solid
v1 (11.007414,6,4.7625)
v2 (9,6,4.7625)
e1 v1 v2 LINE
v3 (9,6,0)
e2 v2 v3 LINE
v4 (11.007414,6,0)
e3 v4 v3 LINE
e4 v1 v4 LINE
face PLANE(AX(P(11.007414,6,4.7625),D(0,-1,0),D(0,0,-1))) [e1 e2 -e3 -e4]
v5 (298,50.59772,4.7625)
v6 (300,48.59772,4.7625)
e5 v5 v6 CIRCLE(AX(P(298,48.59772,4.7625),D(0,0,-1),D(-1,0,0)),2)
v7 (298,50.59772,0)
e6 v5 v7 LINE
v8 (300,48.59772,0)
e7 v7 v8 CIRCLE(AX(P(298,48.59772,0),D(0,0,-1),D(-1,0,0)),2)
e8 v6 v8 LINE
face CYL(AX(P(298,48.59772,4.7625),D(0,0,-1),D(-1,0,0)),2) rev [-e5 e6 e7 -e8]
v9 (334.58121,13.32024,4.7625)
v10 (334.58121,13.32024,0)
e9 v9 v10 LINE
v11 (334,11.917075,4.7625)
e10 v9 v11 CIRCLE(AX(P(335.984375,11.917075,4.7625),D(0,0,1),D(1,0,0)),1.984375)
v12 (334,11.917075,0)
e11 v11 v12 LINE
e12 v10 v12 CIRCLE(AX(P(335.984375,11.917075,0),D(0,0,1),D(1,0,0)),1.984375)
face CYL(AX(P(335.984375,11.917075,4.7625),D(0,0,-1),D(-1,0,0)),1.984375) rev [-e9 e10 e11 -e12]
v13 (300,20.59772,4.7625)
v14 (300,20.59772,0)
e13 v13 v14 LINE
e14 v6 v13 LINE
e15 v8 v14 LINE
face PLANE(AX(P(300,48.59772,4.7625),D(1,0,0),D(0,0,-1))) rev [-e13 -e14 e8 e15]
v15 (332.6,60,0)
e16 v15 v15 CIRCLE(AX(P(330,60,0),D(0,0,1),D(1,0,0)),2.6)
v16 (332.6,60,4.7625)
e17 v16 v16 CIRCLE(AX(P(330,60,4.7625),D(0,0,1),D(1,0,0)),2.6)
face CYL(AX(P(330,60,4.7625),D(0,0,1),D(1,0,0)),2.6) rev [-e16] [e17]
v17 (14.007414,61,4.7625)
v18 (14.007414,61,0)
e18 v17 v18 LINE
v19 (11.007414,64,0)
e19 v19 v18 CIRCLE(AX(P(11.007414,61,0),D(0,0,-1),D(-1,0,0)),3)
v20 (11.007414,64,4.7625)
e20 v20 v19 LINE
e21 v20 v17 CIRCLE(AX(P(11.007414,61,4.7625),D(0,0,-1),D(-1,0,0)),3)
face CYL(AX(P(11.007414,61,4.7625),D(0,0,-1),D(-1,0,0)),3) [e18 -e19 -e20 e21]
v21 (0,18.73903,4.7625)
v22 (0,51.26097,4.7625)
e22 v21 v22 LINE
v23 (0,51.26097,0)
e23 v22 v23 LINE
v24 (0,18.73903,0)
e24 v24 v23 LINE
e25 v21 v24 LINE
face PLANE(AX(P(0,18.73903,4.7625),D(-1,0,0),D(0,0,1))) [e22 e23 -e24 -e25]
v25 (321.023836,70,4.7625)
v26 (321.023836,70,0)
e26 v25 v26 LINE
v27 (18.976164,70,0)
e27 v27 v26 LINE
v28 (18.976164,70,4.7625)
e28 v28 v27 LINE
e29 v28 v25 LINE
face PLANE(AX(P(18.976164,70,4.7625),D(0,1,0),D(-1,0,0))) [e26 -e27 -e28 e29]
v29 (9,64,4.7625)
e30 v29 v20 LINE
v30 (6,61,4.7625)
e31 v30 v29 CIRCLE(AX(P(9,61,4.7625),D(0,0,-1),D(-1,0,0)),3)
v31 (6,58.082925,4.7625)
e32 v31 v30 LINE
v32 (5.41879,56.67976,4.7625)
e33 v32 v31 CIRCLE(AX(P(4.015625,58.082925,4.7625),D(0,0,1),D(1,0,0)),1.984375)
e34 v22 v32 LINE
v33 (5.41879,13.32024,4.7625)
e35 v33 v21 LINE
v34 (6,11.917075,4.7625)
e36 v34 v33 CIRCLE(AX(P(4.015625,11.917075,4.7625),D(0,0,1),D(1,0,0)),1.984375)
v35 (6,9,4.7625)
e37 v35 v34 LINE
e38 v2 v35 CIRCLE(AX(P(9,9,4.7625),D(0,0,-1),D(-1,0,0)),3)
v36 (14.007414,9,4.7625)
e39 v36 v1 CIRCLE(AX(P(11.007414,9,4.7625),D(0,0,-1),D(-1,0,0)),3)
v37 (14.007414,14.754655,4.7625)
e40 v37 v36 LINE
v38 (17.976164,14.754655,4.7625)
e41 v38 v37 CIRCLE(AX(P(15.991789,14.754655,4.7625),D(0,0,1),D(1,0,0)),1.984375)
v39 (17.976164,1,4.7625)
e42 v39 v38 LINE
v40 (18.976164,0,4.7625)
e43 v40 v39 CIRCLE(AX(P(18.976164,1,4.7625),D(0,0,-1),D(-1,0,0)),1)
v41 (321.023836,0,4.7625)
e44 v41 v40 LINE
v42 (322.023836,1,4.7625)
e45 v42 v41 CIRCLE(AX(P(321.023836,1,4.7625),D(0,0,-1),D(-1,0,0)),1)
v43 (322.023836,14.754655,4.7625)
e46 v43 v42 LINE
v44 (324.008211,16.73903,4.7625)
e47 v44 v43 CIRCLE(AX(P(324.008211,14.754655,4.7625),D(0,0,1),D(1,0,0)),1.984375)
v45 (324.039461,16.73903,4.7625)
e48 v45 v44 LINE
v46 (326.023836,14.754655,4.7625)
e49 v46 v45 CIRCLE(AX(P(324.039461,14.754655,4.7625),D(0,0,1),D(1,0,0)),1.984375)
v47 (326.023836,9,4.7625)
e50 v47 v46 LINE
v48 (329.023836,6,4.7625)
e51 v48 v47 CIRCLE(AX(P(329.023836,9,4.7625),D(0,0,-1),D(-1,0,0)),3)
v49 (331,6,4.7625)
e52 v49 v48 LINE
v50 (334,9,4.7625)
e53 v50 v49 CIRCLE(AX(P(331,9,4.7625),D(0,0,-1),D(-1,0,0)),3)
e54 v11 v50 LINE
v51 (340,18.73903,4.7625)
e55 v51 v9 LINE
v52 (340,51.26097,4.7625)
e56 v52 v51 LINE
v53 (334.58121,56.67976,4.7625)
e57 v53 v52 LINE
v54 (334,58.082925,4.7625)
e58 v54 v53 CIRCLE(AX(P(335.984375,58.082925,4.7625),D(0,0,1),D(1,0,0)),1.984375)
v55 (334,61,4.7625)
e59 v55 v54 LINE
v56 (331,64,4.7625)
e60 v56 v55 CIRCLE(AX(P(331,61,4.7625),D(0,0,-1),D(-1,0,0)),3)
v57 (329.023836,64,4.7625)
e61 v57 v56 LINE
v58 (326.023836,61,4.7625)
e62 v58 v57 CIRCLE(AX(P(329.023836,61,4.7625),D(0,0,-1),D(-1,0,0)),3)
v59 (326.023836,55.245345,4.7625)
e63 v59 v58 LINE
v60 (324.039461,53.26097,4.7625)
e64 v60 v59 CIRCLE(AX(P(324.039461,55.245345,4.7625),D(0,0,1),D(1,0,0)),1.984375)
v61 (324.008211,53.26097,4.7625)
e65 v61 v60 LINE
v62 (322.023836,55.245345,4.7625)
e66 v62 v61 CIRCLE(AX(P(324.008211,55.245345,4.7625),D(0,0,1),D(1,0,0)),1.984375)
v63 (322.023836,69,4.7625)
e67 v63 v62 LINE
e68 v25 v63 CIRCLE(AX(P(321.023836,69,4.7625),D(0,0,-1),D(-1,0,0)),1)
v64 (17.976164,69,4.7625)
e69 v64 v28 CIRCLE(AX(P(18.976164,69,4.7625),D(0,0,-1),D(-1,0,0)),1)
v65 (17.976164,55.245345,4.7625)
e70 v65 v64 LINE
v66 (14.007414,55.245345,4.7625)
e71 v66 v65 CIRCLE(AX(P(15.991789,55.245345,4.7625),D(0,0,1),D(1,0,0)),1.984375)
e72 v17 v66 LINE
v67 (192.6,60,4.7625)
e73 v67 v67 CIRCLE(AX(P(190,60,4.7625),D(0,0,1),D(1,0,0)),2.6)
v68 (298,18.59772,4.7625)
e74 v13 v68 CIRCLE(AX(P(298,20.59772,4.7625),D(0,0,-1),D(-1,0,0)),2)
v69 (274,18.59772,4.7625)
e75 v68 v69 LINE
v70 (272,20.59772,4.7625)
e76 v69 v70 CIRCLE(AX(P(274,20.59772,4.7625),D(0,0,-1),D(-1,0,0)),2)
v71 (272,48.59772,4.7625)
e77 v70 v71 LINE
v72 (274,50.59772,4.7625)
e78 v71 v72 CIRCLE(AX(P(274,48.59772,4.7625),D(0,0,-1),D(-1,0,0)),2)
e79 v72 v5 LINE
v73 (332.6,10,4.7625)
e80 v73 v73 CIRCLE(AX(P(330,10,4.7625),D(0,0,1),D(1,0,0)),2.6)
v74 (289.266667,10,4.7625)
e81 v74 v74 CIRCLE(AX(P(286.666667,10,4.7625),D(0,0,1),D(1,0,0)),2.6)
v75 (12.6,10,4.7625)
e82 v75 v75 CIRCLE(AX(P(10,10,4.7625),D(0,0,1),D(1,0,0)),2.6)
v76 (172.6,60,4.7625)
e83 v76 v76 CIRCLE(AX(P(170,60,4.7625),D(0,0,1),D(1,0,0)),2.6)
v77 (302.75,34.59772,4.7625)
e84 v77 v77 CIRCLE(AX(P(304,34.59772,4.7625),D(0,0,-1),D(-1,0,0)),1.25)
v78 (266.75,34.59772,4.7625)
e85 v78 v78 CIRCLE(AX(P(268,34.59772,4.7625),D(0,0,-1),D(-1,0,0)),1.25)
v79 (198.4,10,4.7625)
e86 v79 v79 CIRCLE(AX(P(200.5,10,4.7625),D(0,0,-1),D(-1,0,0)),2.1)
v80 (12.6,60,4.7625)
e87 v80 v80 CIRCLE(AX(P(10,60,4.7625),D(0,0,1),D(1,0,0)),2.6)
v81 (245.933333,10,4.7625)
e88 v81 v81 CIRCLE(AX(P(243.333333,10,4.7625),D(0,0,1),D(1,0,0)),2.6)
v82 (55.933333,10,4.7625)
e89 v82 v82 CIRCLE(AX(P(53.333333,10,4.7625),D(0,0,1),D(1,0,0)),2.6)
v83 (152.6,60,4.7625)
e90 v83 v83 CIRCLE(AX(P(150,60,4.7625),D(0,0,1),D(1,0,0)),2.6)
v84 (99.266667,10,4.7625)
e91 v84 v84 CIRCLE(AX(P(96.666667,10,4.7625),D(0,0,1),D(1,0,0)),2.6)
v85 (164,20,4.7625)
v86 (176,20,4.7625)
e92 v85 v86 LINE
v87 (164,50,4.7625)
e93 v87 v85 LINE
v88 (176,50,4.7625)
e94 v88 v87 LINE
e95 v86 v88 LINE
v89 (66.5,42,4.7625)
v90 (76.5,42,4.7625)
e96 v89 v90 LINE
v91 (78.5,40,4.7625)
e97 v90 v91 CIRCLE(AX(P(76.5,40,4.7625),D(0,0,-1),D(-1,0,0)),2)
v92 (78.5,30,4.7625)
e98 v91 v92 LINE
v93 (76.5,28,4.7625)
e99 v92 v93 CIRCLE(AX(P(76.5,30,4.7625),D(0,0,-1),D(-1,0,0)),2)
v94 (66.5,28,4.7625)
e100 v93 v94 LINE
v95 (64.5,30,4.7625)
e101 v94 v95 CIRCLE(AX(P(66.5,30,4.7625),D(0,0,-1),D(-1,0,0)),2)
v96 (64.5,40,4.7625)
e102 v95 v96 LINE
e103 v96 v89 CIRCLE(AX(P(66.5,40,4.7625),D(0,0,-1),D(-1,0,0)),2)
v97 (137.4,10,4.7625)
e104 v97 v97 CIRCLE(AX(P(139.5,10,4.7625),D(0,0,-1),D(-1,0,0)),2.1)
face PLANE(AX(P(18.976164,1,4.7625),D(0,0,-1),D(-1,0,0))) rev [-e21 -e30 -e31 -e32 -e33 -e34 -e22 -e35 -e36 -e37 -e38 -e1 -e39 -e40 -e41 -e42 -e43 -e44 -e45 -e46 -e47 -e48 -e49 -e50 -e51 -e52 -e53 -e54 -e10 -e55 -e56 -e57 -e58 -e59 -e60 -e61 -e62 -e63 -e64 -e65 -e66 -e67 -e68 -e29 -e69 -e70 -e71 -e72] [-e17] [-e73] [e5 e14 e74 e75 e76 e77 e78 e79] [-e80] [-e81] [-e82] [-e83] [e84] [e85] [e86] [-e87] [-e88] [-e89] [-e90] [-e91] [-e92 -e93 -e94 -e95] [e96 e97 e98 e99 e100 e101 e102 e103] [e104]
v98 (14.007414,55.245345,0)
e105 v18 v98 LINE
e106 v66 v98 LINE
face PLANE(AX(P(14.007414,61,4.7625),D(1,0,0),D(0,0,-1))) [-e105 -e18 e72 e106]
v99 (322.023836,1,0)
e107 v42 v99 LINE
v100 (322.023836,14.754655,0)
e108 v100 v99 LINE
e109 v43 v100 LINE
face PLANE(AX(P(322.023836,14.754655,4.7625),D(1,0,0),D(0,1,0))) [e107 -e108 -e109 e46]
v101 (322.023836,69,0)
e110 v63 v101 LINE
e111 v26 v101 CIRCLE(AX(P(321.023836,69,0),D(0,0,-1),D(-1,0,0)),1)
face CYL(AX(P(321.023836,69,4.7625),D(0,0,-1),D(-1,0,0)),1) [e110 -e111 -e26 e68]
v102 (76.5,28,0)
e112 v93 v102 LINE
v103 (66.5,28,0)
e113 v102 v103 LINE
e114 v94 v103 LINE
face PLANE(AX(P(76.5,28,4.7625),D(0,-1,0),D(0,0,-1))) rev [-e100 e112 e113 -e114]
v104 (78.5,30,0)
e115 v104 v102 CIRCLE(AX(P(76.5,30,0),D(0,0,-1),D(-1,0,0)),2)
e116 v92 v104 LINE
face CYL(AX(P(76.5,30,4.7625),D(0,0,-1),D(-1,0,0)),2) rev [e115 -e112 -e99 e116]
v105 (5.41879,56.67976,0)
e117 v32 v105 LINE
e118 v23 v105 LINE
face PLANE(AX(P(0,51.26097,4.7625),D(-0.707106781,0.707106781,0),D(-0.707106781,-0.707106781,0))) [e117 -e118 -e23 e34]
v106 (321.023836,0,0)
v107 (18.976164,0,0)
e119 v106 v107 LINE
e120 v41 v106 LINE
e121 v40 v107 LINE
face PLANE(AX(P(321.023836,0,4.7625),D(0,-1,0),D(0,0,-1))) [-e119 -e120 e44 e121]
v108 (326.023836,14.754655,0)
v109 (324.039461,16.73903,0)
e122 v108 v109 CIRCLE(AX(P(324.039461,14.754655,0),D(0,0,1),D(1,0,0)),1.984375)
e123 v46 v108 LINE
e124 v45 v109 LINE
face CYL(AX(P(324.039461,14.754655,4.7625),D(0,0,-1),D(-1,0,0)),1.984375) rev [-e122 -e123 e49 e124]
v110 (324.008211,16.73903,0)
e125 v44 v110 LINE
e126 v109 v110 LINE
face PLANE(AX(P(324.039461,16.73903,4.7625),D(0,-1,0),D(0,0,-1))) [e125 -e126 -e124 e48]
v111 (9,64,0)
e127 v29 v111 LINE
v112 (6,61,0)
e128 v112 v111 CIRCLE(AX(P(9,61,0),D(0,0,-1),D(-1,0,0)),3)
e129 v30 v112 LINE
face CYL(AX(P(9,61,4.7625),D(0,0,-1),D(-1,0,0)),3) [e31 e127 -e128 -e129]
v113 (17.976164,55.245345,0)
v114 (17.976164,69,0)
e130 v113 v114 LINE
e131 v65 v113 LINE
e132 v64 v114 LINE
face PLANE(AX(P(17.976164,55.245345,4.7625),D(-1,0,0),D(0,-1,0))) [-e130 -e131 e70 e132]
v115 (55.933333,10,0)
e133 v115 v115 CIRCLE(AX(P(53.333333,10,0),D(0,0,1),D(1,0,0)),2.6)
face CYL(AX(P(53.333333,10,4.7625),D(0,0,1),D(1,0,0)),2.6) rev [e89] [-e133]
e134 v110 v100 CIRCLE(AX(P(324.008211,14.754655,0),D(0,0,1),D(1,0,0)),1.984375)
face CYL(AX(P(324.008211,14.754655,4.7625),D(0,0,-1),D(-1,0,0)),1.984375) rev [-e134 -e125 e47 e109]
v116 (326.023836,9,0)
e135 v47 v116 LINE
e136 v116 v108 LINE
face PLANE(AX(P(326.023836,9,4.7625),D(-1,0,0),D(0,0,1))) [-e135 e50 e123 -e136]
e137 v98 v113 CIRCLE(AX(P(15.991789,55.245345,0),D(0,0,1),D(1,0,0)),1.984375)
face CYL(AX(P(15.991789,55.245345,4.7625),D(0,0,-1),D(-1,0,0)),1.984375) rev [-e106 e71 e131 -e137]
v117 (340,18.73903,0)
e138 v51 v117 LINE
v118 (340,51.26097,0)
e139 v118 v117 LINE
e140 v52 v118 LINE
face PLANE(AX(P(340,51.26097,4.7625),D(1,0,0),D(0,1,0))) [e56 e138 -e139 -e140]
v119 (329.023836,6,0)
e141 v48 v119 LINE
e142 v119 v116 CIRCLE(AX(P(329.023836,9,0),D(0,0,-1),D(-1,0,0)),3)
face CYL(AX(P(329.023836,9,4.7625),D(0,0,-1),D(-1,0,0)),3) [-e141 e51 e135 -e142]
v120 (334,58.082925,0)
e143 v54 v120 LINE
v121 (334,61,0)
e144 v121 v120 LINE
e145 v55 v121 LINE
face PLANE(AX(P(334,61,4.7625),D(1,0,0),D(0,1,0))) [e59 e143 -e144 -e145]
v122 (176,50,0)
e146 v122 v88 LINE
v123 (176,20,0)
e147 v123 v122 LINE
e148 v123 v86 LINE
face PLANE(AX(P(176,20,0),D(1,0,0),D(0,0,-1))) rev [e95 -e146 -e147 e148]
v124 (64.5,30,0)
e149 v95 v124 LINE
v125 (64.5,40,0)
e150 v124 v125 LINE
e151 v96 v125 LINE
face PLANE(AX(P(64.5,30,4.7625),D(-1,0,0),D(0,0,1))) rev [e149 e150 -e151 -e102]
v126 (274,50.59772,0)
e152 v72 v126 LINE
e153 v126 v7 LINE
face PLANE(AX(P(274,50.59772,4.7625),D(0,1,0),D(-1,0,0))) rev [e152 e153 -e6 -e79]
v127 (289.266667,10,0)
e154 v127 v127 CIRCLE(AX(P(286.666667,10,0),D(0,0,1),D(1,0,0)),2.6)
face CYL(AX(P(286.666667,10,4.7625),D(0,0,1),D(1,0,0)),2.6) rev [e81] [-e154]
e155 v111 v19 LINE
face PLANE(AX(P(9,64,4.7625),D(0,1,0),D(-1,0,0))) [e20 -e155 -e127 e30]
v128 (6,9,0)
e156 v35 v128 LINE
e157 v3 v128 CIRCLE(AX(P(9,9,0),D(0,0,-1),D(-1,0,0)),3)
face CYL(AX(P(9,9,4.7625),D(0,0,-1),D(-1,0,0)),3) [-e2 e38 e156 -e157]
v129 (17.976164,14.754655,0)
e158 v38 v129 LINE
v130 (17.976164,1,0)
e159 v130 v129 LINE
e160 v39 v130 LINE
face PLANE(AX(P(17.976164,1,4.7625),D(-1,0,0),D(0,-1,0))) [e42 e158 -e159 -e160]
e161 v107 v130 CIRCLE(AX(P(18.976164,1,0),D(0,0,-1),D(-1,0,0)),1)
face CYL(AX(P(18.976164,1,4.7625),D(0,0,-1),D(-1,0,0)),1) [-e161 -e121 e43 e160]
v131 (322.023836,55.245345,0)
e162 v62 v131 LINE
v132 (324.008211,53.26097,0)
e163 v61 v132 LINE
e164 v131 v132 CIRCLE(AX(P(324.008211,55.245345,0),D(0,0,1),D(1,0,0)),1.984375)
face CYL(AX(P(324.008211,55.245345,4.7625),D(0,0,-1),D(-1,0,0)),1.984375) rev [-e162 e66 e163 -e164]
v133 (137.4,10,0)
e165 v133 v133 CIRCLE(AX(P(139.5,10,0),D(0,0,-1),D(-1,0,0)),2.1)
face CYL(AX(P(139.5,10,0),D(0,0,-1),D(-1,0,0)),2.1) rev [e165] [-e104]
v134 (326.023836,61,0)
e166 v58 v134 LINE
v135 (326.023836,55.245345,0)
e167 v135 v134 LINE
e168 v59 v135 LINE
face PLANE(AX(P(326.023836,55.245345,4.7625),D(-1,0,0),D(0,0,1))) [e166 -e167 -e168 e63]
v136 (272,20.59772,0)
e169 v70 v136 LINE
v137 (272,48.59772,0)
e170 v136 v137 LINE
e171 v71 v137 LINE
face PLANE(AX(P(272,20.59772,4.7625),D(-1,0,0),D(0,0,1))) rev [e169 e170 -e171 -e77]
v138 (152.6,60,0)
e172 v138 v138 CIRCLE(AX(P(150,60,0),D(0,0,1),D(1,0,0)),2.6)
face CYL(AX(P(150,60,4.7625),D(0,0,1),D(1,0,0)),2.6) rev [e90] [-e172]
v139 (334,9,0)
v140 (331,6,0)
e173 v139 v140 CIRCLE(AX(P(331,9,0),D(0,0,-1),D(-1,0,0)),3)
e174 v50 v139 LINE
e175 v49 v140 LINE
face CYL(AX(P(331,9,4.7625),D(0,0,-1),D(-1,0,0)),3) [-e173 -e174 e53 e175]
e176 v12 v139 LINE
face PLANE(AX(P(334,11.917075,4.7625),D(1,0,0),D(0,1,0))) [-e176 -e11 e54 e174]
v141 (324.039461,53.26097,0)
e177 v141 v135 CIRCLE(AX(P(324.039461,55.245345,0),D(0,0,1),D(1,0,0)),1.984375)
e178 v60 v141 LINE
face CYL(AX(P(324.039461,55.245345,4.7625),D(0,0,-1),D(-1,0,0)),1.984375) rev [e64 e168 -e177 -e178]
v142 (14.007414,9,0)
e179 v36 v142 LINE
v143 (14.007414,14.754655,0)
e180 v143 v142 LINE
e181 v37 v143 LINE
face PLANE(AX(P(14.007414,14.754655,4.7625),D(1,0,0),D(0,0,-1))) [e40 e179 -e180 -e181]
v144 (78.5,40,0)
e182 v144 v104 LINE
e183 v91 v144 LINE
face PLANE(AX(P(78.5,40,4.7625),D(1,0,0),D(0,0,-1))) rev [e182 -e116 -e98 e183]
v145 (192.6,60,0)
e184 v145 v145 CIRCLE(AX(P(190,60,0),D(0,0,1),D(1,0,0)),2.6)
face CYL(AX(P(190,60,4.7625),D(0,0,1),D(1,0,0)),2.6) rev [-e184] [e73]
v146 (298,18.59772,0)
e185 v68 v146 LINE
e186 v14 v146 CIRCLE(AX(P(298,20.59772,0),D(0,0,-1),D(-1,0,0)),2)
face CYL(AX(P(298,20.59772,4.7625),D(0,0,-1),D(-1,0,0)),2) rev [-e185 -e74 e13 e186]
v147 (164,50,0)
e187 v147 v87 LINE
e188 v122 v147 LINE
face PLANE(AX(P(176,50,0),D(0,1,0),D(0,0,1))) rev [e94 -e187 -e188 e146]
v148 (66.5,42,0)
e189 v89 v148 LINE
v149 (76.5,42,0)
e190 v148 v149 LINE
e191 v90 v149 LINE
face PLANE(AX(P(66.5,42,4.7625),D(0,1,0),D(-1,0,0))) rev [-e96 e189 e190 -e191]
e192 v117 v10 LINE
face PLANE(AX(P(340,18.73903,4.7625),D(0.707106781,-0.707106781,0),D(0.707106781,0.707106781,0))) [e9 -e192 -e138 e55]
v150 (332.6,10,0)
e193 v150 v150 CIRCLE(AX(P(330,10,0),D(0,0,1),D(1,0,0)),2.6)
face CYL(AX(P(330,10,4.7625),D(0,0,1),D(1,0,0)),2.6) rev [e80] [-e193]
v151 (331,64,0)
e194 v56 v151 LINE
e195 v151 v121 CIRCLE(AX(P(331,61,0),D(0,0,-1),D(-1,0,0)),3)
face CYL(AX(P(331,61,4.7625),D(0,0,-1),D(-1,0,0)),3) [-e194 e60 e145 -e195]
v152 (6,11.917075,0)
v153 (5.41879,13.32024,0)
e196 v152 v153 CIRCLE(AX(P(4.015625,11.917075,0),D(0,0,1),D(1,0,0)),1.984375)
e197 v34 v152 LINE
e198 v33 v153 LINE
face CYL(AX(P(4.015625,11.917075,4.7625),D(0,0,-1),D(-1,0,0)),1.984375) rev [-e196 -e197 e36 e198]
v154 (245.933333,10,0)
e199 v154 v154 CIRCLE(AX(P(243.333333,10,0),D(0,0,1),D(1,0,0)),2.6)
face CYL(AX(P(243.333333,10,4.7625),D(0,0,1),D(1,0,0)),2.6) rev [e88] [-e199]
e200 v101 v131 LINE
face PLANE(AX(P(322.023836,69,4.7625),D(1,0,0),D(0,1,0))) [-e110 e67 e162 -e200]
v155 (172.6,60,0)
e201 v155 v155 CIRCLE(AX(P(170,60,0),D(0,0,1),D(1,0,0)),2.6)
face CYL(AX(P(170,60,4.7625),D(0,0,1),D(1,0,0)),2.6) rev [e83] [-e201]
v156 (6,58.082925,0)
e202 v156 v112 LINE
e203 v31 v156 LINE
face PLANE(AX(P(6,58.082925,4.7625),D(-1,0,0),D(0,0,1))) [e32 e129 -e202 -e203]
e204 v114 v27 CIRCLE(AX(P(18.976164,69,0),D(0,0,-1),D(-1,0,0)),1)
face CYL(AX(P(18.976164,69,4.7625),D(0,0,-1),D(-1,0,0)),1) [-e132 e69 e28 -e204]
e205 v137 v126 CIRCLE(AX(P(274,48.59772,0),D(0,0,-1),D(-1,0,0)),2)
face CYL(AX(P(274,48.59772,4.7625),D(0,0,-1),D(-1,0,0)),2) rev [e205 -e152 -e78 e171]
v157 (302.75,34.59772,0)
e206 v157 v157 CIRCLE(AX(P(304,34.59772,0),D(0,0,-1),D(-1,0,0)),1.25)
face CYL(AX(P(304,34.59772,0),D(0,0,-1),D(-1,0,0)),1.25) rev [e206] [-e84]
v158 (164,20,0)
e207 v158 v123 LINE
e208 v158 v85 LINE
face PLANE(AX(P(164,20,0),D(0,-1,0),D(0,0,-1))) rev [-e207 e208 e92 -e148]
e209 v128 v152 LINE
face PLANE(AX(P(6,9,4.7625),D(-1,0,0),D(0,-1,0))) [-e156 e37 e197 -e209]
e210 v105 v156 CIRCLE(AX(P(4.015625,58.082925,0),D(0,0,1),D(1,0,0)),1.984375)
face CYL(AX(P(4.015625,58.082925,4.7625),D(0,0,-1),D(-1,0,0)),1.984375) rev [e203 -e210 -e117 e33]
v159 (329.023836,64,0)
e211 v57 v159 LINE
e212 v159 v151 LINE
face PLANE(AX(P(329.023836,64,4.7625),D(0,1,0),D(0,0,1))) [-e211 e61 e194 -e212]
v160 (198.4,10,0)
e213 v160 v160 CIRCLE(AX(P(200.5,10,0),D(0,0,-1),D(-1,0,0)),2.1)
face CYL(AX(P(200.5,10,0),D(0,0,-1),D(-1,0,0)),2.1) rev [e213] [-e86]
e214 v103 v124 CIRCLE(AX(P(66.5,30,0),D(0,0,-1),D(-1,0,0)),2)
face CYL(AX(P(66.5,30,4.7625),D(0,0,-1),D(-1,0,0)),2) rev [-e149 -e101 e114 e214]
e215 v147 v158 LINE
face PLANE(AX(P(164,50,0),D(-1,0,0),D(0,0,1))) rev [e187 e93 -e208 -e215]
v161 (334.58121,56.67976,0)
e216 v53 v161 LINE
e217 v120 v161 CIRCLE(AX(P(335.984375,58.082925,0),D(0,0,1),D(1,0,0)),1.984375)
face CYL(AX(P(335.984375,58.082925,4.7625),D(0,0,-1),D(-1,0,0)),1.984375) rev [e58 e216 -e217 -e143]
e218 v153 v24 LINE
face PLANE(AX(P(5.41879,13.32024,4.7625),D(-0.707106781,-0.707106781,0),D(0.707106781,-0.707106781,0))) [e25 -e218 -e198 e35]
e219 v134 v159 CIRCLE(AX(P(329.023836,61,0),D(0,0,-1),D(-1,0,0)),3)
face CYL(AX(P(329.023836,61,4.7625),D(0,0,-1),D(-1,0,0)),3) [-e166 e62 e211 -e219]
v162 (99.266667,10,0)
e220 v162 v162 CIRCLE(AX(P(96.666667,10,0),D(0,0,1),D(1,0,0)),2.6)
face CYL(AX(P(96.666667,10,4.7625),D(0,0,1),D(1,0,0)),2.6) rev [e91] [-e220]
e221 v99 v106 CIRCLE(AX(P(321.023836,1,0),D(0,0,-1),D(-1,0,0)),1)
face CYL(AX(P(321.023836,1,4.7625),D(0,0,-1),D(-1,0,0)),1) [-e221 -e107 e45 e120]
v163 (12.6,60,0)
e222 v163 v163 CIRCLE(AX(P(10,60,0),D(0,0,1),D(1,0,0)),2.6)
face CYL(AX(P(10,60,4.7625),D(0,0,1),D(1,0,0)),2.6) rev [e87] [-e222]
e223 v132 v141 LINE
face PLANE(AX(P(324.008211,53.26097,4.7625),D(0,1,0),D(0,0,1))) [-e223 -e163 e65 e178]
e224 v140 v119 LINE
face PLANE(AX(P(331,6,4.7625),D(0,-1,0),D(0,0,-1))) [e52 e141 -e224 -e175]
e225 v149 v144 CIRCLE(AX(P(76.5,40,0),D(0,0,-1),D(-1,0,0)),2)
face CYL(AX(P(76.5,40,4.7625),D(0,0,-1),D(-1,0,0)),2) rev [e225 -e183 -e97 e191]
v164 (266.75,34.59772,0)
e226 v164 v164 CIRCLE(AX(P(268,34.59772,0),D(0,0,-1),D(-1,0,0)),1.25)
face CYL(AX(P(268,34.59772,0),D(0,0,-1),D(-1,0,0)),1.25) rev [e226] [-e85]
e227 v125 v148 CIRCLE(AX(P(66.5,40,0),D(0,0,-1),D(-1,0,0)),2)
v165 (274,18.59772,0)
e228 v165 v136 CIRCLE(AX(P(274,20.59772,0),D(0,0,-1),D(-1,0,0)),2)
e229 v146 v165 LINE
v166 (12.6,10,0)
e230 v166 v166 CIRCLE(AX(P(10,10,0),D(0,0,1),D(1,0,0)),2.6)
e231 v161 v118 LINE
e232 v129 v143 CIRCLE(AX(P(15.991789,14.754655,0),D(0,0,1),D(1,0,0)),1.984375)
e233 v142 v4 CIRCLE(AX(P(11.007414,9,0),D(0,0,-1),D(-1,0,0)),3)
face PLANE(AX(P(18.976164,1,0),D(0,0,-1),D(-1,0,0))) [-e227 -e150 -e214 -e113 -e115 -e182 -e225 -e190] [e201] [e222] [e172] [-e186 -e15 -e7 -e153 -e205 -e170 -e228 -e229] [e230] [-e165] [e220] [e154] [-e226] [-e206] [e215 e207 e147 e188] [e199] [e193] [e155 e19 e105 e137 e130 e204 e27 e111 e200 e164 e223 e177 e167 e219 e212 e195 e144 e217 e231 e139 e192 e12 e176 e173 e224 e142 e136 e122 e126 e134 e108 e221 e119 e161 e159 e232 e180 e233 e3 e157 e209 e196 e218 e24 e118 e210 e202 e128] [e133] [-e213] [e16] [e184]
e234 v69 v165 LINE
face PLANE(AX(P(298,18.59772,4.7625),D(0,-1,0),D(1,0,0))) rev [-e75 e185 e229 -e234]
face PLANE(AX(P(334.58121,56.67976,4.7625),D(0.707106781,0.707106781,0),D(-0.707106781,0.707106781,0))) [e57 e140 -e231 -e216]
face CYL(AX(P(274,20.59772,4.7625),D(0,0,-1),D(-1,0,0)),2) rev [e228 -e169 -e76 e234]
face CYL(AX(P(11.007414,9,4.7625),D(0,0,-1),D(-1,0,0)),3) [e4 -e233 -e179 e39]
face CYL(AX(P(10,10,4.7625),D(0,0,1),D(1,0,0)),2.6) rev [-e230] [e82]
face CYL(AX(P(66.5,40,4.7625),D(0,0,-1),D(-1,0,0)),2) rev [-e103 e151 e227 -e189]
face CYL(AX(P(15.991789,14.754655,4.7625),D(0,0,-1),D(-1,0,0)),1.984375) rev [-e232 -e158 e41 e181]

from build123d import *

# Parameters (mm, degrees)
BASE_FLANGE1_DEPTH         = 4.7625
CUT_EXTRUDE1_DEPTH         = 348.163767416
CUT_EXTRUDE2_DEPTH         = 348.163767416
SKETCH20_W                 = 12
SKETCH20_H                 = 30
CUT_EXTRUDE5_DEPTH         = 348.163767416
F_5_2_5_2_DIAMETER_HOLE1_D = 5.2
F_4_2_4_2_DIAMETER_HOLE1_D = 4.2
F_2_5_2_5_DIAMETER_HOLE1_D = 2.5


# Sheet-metal steps are written as plain solids
with BuildPart() as part:
    # Sketch11 → Base-Flange1 (new body)
    with BuildSketch(Plane(origin=(0, 0, 0), x_dir=(-1, 0, 0), z_dir=(0, 0, -1))):
        with BuildLine():
            Line((-17.976164198, 1), (-17.976164198, 14.75465548))
            ThreePointArc((-17.976164198, 14.75465548), (-15.991789198, 16.73903048), (-14.007414198, 14.75465548))
            Line((-14.007414198, 14.75465548), (-14.007414198, 9))
            ThreePointArc((-14.007414198, 9), (-13.128734542, 6.878679656), (-11.007414198, 6))
            Line((-11.007414198, 6), (-9, 6))
            ThreePointArc((-9, 6), (-6.878679657, 6.878679656), (-6, 9))
            Line((-6, 9), (-6, 11.917075442))
            ThreePointArc((-6, 11.917075442), (-5.848948447, 12.676462879), (-5.418790019, 13.320240461))
            Line((-5.418790019, 13.320240461), (0, 18.73903048))
            Line((0, 18.73903048), (0, 51.26096952))
            Line((0, 51.26096952), (-5.418790019, 56.679759539))
            ThreePointArc((-5.418790019, 56.679759539), (-5.848948447, 57.323537121), (-6, 58.082924558))
            Line((-6, 58.082924558), (-6, 61))
            ThreePointArc((-6, 61), (-6.878679657, 63.121320343), (-9, 64))
            Line((-9, 64), (-11.007414198, 64))
            ThreePointArc((-11.007414198, 64), (-13.128734542, 63.121320343), (-14.007414198, 61))
            Line((-14.007414198, 61), (-14.007414198, 55.24534452))
            ThreePointArc((-14.007414198, 55.24534452), (-15.991789198, 53.26096952), (-17.976164198, 55.24534452))
            Line((-17.976164198, 55.24534452), (-17.976164198, 69))
            ThreePointArc((-17.976164198, 69), (-18.269057417, 69.707106781), (-18.976164198, 70))
            Line((-18.976164198, 70), (-321.023835802, 70))
            ThreePointArc((-321.023835802, 70), (-321.730942583, 69.707106781), (-322.023835802, 69))
            Line((-322.023835802, 69), (-322.023835802, 55.24534452))
            ThreePointArc((-322.023835802, 55.24534452), (-322.605045783, 53.842179501), (-324.008210802, 53.26096952))
            Line((-324.008210802, 53.26096952), (-324.039460804, 53.26096952))
            ThreePointArc((-324.039460804, 53.26096952), (-325.442625823, 53.842179501), (-326.023835804, 55.24534452))
            Line((-326.023835804, 55.24534452), (-326.023835804, 61))
            ThreePointArc((-326.023835804, 61), (-326.90251546, 63.121320343), (-329.023835804, 64))
            Line((-329.023835804, 64), (-331, 64))
            ThreePointArc((-331, 64), (-333.121320344, 63.121320343), (-334, 61))
            Line((-334, 61), (-334, 58.082924558))
            ThreePointArc((-334, 58.082924558), (-334.151051553, 57.323537121), (-334.581209981, 56.679759539))
            Line((-334.581209981, 56.679759539), (-340, 51.26096952))
            Line((-340, 51.26096952), (-340, 18.73903048))
            Line((-340, 18.73903048), (-334.581209981, 13.320240461))
            ThreePointArc((-334.581209981, 13.320240461), (-334.151051553, 12.676462879), (-334, 11.917075442))
            Line((-334, 11.917075442), (-334, 9))
            ThreePointArc((-334, 9), (-333.121320344, 6.878679656), (-331, 6))
            Line((-331, 6), (-329.023835804, 6))
            ThreePointArc((-329.023835804, 6), (-326.90251546, 6.878679656), (-326.023835804, 9))
            Line((-326.023835804, 9), (-326.023835804, 14.75465548))
            ThreePointArc((-326.023835804, 14.75465548), (-325.442625823, 16.157820499), (-324.039460804, 16.73903048))
            Line((-324.039460804, 16.73903048), (-324.008210802, 16.73903048))
            ThreePointArc((-324.008210802, 16.73903048), (-322.605045783, 16.157820499), (-322.023835802, 14.75465548))
            Line((-322.023835802, 14.75465548), (-322.023835802, 1))
            ThreePointArc((-322.023835802, 1), (-321.730942583, 0.292893219), (-321.023835802, 0))
            Line((-321.023835802, 0), (-18.976164198, 0))
            ThreePointArc((-18.976164198, 0), (-18.269057417, 0.292893219), (-17.976164198, 1))
        make_face()
    extrude(amount=-BASE_FLANGE1_DEPTH)

    # Sketch16 → Cut-Extrude1 (cut, through all)
    with BuildSketch(Plane(origin=(0, 0, 0), x_dir=(-1, 0, 0), z_dir=(0, 0, -1))):
        with BuildLine():
            Line((-274, 50.597720146), (-298, 50.597720146))
            ThreePointArc((-298, 50.597720146), (-299.414213562, 50.011933709), (-300, 48.597720146))
            Line((-300, 48.597720146), (-300, 20.597720146))
            ThreePointArc((-300, 20.597720146), (-299.414213562, 19.183506584), (-298, 18.597720146))
            Line((-298, 18.597720146), (-274, 18.597720146))
            ThreePointArc((-274, 18.597720146), (-272.585786438, 19.183506584), (-272, 20.597720146))
            Line((-272, 20.597720146), (-272, 48.597720146))
            ThreePointArc((-272, 48.597720146), (-272.585786438, 50.011933709), (-274, 50.597720146))
        make_face()
    extrude(amount=-CUT_EXTRUDE1_DEPTH, mode=Mode.SUBTRACT)

    # Sketch17 → Cut-Extrude2 (cut, through all)
    with BuildSketch(Plane(origin=(0, 0, 0), x_dir=(-1, 0, 0), z_dir=(0, 0, -1))):
        with BuildLine():
            Line((-64.5, 30), (-64.5, 40))
            ThreePointArc((-64.5, 40), (-65.085786438, 41.414213562), (-66.5, 42))
            Line((-66.5, 42), (-76.5, 42))
            ThreePointArc((-76.5, 42), (-77.914213563, 41.414213562), (-78.5, 40))
            Line((-78.5, 40), (-78.5, 30))
            ThreePointArc((-78.5, 30), (-77.914213563, 28.585786438), (-76.5, 28))
            Line((-76.5, 28), (-66.5, 28))
            ThreePointArc((-66.5, 28), (-65.085786438, 28.585786438), (-64.5, 30))
        make_face()
    extrude(amount=-CUT_EXTRUDE2_DEPTH, mode=Mode.SUBTRACT)

    # Sketch20 → Cut-Extrude5 (cut, through all)
    with BuildSketch(Plane.XY.offset(4.7625)):
        with Locations((170, 35)):
            Rectangle(SKETCH20_W, SKETCH20_H)
    extrude(amount=-CUT_EXTRUDE5_DEPTH, mode=Mode.SUBTRACT)

    # Ø5.2 (5.2) Diameter Hole1 (through all)
    with Locations(Plane.XY.offset(4.7625)):
        with Locations((170, 60), (330, 60), (10, 10), (10, 60), (330, 10), (150, 60), (190, 60), (53.333333333, 10), (96.666666667, 10), (243.333333333, 10), (286.666666667, 10)):
            Hole(F_5_2_5_2_DIAMETER_HOLE1_D / 2)

    # Ø4.2 (4.2) Diameter Hole1 (through all)
    with Locations(Plane(origin=(0, 0, 0), x_dir=(-1, 0, 0), z_dir=(0, 0, -1))):
        with Locations((-200.5, 10), (-139.5, 10)):
            Hole(F_4_2_4_2_DIAMETER_HOLE1_D / 2)

    # Ø2.5 (2.5) Diameter Hole1 (through all)
    with Locations(Plane(origin=(0, 0, 0), x_dir=(-1, 0, 0), z_dir=(0, 0, -1))):
        with Locations((-304, 34.597720146), (-268, 34.597720146)):
            Hole(F_2_5_2_5_DIAMETER_HOLE1_D / 2)


solid = part.part
